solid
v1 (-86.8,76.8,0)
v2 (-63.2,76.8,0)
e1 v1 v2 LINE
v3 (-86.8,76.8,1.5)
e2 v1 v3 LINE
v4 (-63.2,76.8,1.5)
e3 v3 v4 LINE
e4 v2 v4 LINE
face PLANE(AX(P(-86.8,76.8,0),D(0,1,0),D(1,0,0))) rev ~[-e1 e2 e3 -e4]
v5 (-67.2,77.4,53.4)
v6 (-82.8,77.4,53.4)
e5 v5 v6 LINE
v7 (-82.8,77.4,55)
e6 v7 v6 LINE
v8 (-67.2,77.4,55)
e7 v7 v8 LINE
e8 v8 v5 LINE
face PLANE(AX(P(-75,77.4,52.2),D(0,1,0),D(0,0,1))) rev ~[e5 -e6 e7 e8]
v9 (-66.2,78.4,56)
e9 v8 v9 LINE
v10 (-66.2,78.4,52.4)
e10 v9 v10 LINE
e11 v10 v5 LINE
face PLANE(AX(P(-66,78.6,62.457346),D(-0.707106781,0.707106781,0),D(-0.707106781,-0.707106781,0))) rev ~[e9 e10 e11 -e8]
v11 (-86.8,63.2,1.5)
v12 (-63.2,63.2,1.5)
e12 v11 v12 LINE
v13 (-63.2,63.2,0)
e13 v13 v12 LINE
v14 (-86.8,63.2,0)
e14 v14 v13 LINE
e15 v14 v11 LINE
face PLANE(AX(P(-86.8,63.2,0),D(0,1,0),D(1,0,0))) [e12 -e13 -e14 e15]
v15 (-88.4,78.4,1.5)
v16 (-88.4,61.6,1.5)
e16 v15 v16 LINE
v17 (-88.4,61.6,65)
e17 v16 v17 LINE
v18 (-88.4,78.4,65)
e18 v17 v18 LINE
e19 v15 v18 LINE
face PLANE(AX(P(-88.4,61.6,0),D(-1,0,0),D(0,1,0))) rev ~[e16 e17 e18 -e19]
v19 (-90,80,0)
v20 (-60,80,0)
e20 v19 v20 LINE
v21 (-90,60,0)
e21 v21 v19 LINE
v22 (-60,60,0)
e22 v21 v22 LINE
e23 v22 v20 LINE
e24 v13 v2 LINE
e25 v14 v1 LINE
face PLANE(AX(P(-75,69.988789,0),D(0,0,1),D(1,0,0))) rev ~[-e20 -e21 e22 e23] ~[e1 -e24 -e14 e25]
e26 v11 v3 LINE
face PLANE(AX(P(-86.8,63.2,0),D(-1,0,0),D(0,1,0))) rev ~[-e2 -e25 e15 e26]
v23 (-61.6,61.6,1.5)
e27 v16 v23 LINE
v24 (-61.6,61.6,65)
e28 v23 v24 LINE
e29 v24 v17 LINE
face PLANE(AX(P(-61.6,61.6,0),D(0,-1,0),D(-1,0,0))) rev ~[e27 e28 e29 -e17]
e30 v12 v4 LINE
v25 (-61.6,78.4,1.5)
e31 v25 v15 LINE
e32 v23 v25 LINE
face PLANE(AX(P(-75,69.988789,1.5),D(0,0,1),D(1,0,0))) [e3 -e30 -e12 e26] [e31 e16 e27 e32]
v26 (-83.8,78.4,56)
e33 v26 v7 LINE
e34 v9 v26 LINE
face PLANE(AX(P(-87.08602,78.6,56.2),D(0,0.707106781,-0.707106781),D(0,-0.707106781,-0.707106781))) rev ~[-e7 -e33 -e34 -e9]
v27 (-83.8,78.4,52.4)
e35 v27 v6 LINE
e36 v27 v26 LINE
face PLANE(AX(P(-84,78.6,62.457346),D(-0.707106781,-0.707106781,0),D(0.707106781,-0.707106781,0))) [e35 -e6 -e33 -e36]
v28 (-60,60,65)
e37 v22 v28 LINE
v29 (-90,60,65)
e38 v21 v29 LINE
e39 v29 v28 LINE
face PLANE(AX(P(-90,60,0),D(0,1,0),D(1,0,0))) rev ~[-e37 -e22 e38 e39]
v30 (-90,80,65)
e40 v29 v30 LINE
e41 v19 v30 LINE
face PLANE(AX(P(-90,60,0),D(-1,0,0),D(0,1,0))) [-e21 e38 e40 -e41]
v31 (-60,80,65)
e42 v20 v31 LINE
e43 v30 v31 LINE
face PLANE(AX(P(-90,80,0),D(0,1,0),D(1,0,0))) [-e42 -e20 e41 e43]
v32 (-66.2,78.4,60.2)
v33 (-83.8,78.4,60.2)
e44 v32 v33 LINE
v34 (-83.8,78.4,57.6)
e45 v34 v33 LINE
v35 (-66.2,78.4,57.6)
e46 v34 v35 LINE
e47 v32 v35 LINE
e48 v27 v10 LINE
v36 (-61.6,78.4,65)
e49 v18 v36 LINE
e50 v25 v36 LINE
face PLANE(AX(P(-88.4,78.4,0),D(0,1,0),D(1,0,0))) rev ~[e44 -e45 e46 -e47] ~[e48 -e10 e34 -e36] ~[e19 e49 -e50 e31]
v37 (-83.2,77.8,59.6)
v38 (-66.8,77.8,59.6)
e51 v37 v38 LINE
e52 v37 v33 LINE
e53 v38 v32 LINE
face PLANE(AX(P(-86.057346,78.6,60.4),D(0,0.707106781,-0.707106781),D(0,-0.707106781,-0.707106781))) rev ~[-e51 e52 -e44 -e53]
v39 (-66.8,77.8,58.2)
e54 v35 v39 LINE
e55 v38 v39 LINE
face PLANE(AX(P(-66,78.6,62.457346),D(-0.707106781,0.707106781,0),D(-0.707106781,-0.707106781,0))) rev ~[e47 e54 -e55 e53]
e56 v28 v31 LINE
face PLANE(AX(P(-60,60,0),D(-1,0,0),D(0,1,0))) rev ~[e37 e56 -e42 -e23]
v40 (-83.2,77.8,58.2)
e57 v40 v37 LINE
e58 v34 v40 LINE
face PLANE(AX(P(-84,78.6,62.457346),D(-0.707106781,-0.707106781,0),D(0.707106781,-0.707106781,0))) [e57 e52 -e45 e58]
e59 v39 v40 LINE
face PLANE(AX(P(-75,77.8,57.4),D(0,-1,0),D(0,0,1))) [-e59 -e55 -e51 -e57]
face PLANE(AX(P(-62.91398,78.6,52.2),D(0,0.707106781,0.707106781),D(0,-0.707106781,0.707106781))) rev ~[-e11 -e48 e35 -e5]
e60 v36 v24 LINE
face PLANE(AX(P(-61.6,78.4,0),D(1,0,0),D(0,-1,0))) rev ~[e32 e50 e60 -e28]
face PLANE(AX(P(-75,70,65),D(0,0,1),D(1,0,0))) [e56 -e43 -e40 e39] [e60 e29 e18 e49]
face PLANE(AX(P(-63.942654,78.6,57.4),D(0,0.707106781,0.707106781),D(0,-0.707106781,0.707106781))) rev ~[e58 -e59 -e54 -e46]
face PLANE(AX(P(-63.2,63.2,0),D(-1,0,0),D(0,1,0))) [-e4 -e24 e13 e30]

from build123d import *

# Parameters (mm, degrees)
F0_W         = 30
F0_H         = 20
F1_DEPTH     = 65
F0_W_2       = 23.6
F0_H_2       = 13.6
F0_W_3       = 16.8
F0_H_3       = 1
F2_DEPTH     = 1.5
F4_W         = 0.6
F4_H         = 3
F4_W_2       = 1
F4_H_2       = 4
F5_DEPTH     = 9
F6_T4_DEPTH  = 22.1146927807
F6_T9_DEPTH  = 22.1146927807
F6_T14_DEPTH = 7.1146927807
F6_T19_DEPTH = 7.1146927807
F7_T4_DEPTH  = 24.1720391711
F7_T9_DEPTH  = 24.1720391711
F7_T14_DEPTH = 10.1720391711
F7_T19_DEPTH = 10.1720391711


# Not quite as in the source:
# - a fillet or chamfer that OpenCascade refuses, or shapes differently, is made with other operations: its cross-section is extruded or revolved along the edge and cut away or added


with BuildPart() as f1:
    # F0 (on Top) → F1 (new body)
    with BuildSketch(Plane.XY):
        with Locations((-75, 70)):
            Rectangle(F0_W, F0_H)
        Polygon((-88.4, 61.6), (-88.4, 78.4), (-83.4, 78.4), (-66.6, 78.4), (-61.6, 78.4), (-61.6, 61.6), align=None, mode=Mode.SUBTRACT)
    extrude(amount=F1_DEPTH)

    # F0 (on Top) → F2 (join)
    with BuildSketch(Plane.XY):
        Polygon((-83.4, 78.4), (-88.4, 78.4), (-88.4, 61.6), (-61.6, 61.6), (-61.6, 78.4), (-66.6, 78.4), (-66.6, 77.4), (-83.4, 77.4), align=None)
        with Locations((-75, 70)):
            Rectangle(F0_W_2, F0_H_2, mode=Mode.SUBTRACT)
        with Locations((-75, 77.9)):
            Rectangle(F0_W_3, F0_H_3)
    extrude(amount=F2_DEPTH)

    # F4 (on mid) → F5 (join, symmetric)
    with BuildSketch(Plane.YZ.offset(-75)):
        with Locations((78.1, 58.9)):
            Rectangle(F4_W, F4_H)
        with Locations((77.9, 54.2)):
            Rectangle(F4_W_2, F4_H_2)
    extrude(amount=F5_DEPTH, both=True)

    # F6: chamfer of 0.8 on 4 edges, made by hand


with BuildPart() as f6_tool2:
    # F6_s3 → F6_t4 (new body)
    with BuildSketch(Plane.YZ.offset(-86.0573463904)):
        Polygon((78.6, 60.4), (77.8, 59.6), (77.8, 60.4), align=None)
    extrude(amount=F6_T4_DEPTH)

    split(bisect_by=Plane.XZ.offset(-78.4), keep=Keep.TOP)


with BuildPart() as f1_1:
    add(f1.part)

    # F6_t1: cut F6_tool2
    add(f6_tool2.part, mode=Mode.SUBTRACT)


with BuildPart() as f6_tool7:
    # F6_s8 → F6_t9 (new body)
    with BuildSketch(Plane.YZ.offset(-63.9426536096)):
        Polygon((78.6, 57.4), (77.8, 58.2), (77.8, 57.4), align=None)
    extrude(amount=-F6_T9_DEPTH)

    split(bisect_by=Plane.XZ.offset(-78.4), keep=Keep.TOP)


with BuildPart() as f1_2:
    add(f1_1.part)

    # F6_t6: cut F6_tool7
    add(f6_tool7.part, mode=Mode.SUBTRACT)


with BuildPart() as f6_tool12:
    # F6_s13 → F6_t14 (new body)
    with BuildSketch(Plane.XY.offset(62.4573463904)):
        Polygon((-84, 78.6), (-83.2, 77.8), (-84, 77.8), align=None)
    extrude(amount=-F6_T14_DEPTH)

    split(bisect_by=Plane.XZ.offset(-78.4), keep=Keep.TOP)


with BuildPart() as f1_3:
    add(f1_2.part)

    # F6_t11: cut F6_tool12
    add(f6_tool12.part, mode=Mode.SUBTRACT)


with BuildPart() as f6_tool17:
    # F6_s18 → F6_t19 (new body)
    with BuildSketch(Plane.XY.offset(62.4573463904)):
        Polygon((-66, 78.6), (-66.8, 77.8), (-66, 77.8), align=None)
    extrude(amount=-F6_T19_DEPTH)

    split(bisect_by=Plane.XZ.offset(-78.4), keep=Keep.TOP)


with BuildPart() as f1_4:
    add(f1_3.part)

    # F6_t16: cut F6_tool17
    add(f6_tool17.part, mode=Mode.SUBTRACT)

    # F7: chamfer of 1.2 on 4 edges, made by hand


with BuildPart() as f7_tool2:
    # F7_s3 → F7_t4 (new body)
    with BuildSketch(Plane.YZ.offset(-87.0860195856)):
        Polygon((78.6, 56.2), (77.4, 55), (77.4, 56.2), align=None)
    extrude(amount=F7_T4_DEPTH)

    split(bisect_by=Plane.XZ.offset(-78.4), keep=Keep.TOP)


with BuildPart() as f1_5:
    add(f1_4.part)

    # F7_t1: cut F7_tool2
    add(f7_tool2.part, mode=Mode.SUBTRACT)


with BuildPart() as f7_tool7:
    # F7_s8 → F7_t9 (new body)
    with BuildSketch(Plane.YZ.offset(-62.9139804144)):
        Polygon((78.6, 52.2), (77.4, 53.4), (77.4, 52.2), align=None)
    extrude(amount=-F7_T9_DEPTH)

    split(bisect_by=Plane.XZ.offset(-78.4), keep=Keep.TOP)


with BuildPart() as f1_6:
    add(f1_5.part)

    # F7_t6: cut F7_tool7
    add(f7_tool7.part, mode=Mode.SUBTRACT)


with BuildPart() as f7_tool12:
    # F7_s13 → F7_t14 (new body)
    with BuildSketch(Plane.XY.offset(59.2860195856)):
        Polygon((-84, 78.6), (-82.8, 77.4), (-84, 77.4), align=None)
    extrude(amount=-F7_T14_DEPTH)

    split(bisect_by=Plane.XZ.offset(-78.4), keep=Keep.TOP)


with BuildPart() as f1_7:
    add(f1_6.part)

    # F7_t11: cut F7_tool12
    add(f7_tool12.part, mode=Mode.SUBTRACT)


with BuildPart() as f7_tool17:
    # F7_s18 → F7_t19 (new body)
    with BuildSketch(Plane.XY.offset(59.2860195856)):
        Polygon((-66, 78.6), (-67.2, 77.4), (-66, 77.4), align=None)
    extrude(amount=-F7_T19_DEPTH)

    split(bisect_by=Plane.XZ.offset(-78.4), keep=Keep.TOP)


with BuildPart() as f1_8:
    add(f1_7.part)

    # F7_t16: cut F7_tool17
    add(f7_tool17.part, mode=Mode.SUBTRACT)


solid = f1_8.part
